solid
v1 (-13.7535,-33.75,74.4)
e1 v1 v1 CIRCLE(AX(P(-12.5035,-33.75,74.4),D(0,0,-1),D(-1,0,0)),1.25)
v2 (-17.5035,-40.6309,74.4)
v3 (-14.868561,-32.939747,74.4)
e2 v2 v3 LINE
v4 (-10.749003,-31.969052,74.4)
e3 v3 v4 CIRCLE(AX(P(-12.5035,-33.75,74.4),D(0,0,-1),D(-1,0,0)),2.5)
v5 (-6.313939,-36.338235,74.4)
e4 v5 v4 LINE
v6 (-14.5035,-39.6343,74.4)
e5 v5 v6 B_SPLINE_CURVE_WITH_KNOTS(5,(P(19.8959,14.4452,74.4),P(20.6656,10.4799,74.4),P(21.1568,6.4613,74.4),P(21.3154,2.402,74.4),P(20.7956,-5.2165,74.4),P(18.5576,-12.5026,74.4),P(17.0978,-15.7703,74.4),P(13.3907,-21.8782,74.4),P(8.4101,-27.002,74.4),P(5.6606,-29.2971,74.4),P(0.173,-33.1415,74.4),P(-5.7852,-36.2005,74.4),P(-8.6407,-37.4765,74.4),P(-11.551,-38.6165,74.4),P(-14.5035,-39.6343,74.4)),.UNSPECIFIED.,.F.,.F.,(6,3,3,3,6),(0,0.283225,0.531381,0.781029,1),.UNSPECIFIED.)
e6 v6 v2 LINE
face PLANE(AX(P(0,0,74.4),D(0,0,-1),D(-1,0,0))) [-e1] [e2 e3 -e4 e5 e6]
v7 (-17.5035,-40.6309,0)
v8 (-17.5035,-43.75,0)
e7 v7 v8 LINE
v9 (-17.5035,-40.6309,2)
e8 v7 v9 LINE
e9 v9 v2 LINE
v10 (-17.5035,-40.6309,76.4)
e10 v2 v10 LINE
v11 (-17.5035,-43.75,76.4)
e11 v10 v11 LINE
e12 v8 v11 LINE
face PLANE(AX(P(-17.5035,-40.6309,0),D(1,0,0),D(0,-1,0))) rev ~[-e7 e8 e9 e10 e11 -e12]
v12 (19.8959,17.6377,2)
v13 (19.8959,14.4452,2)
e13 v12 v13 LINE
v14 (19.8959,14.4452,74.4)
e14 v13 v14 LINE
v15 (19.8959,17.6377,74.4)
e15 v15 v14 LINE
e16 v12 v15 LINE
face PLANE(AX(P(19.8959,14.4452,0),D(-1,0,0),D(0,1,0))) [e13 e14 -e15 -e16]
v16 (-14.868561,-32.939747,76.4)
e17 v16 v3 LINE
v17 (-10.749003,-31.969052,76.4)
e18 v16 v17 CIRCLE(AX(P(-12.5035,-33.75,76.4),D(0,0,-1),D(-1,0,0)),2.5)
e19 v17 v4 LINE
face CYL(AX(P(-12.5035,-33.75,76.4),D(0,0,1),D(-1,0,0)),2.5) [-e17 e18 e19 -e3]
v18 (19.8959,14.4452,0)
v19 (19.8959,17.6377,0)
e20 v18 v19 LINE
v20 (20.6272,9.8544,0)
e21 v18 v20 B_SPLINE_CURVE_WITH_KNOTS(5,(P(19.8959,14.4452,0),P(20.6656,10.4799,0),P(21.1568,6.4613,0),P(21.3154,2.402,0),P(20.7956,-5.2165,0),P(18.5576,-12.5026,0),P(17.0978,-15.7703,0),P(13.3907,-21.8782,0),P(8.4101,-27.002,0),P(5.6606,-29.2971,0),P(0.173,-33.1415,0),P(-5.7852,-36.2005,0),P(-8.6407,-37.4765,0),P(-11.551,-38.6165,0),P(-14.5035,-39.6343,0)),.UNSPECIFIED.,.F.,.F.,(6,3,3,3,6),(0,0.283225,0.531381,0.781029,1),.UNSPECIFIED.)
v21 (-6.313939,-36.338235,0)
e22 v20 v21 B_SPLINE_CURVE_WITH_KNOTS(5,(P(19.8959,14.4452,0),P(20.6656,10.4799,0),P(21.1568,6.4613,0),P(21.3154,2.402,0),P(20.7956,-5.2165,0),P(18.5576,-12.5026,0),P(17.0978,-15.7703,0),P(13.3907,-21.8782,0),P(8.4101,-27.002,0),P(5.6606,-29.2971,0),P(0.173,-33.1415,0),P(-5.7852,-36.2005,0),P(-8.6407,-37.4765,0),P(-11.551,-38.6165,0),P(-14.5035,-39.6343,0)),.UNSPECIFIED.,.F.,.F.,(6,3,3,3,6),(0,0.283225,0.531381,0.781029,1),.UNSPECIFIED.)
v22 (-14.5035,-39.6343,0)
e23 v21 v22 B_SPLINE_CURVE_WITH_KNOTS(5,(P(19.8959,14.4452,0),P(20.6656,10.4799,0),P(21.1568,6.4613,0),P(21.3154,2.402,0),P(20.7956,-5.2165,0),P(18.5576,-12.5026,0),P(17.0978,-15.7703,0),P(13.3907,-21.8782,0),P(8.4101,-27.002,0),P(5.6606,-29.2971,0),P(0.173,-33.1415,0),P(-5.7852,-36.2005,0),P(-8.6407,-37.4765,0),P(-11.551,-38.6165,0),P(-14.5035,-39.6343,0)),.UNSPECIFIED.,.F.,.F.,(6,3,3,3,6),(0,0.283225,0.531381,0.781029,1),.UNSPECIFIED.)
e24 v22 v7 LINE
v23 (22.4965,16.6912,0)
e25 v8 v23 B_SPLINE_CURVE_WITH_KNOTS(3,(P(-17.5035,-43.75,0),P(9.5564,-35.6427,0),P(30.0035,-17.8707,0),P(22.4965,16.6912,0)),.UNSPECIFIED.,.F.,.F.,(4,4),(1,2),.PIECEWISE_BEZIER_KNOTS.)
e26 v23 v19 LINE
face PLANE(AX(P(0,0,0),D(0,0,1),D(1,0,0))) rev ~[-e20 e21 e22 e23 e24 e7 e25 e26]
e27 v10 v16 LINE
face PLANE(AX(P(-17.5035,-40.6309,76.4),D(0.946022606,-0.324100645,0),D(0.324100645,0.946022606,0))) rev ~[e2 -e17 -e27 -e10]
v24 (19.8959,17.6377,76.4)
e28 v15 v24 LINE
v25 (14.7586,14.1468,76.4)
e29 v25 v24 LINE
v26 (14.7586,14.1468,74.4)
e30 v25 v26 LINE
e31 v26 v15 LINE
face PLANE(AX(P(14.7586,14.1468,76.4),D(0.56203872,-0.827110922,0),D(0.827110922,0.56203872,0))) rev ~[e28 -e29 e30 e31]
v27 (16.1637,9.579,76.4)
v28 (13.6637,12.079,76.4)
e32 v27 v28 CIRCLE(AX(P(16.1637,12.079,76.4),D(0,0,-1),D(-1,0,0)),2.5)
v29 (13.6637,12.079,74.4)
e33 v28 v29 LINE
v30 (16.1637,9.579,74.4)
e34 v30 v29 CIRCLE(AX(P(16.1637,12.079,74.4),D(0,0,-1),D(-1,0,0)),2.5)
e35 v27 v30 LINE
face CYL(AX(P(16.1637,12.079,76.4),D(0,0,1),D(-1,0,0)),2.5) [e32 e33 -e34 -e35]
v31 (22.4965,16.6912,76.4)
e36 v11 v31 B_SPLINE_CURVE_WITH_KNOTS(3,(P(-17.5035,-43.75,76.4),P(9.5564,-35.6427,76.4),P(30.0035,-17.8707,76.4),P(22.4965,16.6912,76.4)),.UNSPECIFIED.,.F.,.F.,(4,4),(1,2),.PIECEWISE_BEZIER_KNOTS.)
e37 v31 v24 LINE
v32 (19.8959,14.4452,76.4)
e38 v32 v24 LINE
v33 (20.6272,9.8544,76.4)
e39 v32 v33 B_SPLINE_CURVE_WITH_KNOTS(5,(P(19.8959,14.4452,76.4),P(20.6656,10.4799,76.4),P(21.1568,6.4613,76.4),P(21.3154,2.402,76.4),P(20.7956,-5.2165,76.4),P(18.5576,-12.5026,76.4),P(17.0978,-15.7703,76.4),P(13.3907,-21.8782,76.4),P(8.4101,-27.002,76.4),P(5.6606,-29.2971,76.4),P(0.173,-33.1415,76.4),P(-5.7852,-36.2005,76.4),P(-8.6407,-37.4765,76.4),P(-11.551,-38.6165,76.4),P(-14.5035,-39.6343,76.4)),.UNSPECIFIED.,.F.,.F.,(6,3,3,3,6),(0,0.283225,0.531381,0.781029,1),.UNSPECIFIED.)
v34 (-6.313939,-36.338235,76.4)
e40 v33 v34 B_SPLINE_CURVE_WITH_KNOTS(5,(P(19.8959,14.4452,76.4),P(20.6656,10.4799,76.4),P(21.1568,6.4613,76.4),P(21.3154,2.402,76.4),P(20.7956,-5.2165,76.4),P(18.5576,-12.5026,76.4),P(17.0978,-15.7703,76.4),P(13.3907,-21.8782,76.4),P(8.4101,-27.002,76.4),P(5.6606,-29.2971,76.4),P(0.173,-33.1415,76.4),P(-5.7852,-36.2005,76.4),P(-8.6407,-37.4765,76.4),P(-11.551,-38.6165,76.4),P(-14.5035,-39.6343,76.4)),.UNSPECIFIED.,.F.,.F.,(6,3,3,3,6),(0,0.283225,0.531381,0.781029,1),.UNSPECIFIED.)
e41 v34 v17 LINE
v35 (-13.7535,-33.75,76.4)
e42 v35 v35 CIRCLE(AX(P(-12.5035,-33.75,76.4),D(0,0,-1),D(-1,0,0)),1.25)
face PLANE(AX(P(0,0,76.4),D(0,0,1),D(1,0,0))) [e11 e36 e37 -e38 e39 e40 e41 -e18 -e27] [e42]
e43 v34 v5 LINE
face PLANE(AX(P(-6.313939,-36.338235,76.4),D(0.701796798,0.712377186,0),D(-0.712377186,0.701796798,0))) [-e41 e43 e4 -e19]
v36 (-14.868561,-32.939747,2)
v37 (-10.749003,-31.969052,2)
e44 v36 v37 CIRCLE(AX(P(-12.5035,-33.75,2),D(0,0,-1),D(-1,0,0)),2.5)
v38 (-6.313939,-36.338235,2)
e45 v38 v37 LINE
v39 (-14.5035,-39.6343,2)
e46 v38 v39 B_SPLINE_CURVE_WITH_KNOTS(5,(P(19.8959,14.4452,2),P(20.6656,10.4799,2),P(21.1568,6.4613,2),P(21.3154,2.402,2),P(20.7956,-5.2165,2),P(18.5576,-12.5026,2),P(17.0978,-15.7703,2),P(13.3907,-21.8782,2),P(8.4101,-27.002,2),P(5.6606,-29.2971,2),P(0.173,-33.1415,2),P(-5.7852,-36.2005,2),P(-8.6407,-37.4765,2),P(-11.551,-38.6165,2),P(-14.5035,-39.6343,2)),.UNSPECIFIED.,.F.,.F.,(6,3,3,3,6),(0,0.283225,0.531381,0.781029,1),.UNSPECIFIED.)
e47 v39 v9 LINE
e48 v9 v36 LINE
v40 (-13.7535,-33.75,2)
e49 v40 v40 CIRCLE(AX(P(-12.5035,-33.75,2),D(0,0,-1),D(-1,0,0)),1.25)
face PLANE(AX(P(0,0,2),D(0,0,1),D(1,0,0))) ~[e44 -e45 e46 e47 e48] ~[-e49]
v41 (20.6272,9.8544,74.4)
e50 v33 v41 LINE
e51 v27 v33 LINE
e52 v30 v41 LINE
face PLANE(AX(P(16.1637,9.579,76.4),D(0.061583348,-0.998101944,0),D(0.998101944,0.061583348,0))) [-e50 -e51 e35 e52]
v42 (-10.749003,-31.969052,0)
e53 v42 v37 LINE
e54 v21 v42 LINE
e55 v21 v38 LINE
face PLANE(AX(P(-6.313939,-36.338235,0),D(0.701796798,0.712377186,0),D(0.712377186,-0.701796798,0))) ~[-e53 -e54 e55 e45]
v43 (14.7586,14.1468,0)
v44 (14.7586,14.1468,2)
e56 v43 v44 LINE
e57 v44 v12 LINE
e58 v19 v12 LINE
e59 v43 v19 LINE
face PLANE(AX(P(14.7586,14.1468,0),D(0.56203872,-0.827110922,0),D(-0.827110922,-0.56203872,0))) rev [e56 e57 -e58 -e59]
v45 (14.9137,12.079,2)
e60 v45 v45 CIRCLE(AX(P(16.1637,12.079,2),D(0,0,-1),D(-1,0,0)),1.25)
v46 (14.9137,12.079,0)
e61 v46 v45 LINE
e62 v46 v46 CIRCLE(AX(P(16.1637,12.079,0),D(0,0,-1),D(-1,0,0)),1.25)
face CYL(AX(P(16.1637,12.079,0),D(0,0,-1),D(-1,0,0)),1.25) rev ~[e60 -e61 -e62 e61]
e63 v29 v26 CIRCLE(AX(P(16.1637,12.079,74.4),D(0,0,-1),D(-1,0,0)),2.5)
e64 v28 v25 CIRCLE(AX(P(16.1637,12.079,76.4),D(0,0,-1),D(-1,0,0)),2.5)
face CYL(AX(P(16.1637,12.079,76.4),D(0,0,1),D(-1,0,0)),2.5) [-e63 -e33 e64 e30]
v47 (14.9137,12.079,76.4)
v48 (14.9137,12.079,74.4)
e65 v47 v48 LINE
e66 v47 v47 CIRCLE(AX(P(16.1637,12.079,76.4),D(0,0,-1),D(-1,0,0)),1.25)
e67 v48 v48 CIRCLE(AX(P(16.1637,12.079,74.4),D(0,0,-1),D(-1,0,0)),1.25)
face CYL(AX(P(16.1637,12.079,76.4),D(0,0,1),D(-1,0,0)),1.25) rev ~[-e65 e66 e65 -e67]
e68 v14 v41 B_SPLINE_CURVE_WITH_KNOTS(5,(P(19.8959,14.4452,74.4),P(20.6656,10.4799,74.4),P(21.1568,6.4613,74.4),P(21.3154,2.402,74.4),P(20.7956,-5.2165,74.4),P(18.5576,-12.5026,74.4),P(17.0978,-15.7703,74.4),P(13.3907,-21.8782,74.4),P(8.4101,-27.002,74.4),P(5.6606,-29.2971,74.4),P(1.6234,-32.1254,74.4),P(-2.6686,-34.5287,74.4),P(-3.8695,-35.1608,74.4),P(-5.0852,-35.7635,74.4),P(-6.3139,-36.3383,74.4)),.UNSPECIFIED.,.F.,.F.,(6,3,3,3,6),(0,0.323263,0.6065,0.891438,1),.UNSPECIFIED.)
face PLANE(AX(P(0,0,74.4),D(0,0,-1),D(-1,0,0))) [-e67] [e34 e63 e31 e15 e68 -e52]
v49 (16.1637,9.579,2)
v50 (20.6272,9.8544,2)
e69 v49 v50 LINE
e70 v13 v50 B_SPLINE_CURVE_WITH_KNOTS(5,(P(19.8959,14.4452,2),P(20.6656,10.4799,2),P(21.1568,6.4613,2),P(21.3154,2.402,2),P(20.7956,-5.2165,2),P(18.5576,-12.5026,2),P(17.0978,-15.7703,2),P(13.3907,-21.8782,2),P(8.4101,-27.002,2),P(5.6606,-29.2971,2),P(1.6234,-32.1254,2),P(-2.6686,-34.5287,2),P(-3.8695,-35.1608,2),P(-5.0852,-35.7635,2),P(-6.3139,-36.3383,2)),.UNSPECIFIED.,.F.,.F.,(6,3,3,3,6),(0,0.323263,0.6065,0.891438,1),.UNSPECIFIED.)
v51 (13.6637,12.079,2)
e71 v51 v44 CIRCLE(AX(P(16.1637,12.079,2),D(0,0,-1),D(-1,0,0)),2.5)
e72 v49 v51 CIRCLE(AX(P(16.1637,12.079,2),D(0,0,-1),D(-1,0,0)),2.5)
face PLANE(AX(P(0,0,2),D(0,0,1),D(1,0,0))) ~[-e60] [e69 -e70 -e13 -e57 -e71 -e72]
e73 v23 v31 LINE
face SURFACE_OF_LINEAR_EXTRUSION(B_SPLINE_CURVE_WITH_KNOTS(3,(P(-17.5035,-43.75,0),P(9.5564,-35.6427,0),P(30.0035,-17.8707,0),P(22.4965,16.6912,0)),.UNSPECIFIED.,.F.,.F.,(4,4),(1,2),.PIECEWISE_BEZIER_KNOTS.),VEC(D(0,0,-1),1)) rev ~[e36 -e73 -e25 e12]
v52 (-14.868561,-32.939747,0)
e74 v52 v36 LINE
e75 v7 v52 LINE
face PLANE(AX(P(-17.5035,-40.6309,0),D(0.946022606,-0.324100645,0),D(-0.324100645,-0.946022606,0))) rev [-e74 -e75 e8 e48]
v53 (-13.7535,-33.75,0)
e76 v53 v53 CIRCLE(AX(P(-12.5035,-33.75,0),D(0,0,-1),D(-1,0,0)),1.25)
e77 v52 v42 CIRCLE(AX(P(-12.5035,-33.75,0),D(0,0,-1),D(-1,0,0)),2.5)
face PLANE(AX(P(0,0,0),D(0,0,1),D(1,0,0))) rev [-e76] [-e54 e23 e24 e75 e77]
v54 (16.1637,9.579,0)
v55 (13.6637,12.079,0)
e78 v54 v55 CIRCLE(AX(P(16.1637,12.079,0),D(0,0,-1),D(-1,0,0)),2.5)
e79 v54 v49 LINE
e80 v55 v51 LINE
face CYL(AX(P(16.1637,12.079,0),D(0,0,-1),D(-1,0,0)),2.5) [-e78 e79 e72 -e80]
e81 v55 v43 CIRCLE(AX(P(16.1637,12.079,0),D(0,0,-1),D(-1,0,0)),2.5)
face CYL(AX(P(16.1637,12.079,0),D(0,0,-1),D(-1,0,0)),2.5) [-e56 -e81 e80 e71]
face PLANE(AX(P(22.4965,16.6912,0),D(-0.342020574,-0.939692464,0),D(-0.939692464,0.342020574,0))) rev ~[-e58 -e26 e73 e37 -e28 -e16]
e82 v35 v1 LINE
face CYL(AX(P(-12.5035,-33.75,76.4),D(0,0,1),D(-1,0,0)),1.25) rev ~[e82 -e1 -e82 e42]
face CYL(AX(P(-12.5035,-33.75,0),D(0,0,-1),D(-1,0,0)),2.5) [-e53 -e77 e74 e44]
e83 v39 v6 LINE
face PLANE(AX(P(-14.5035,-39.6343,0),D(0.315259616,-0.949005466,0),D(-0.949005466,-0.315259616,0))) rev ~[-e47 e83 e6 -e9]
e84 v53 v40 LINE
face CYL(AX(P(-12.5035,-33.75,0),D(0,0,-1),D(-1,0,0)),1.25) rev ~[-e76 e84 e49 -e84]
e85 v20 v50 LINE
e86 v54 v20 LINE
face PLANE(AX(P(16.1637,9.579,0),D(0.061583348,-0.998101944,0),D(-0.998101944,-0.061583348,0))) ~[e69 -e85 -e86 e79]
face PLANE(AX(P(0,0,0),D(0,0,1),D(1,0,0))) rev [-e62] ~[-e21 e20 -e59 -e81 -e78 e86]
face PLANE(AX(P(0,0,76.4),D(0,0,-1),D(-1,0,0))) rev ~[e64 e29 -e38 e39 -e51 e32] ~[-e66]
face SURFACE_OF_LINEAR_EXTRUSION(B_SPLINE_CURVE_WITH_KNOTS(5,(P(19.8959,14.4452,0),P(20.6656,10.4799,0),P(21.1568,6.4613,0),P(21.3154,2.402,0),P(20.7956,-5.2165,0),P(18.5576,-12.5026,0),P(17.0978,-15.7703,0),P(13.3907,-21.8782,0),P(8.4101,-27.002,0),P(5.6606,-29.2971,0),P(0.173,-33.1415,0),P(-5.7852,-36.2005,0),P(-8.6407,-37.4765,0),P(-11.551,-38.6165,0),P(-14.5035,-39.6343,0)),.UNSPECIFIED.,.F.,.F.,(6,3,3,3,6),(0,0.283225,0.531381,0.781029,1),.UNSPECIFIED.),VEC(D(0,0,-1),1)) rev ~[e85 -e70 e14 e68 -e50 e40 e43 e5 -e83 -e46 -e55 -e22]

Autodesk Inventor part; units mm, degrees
ref_plane "Work Plane1" through (0, 0, 0) normal (0, 0, 1) x (1, 0, 0)
sketch "Sketch1" plane through (0, 0, 0) normal (0, 0, 1) x (1, 0, 0)
  spline S0 degree 3 poles (-17.5035, -43.75) (9.5564, -35.6427) (30.0035, -17.8707) (22.4965, 16.6912) knots 1 1 1 1 2 2 2 2 projected
  line L0 (22.4965, 16.6912) -> (-1.9986, 25.6067) projected
  line L1 (-17.5035, 14.75) -> (-17.5035, -43.75) projected
  line L2 (-3.0246, 22.7876) -> (19.8959, 14.4452)
  line L3 (-14.5035, -39.6343) -> (-14.5035, 14.75)
  line L4 (19.8959, 14.4452) -> (19.8959, 17.6377)
  line L5 (-14.5035, -39.6343) -> (-17.5035, -40.6309)
  spline S1 degree 5 poles (19.896, 14.4452) (20.6656, 10.4799) (21.1568, 6.4613) (21.3154, 2.402) (20.7956, -5.2165) (18.5576, -12.5026) (17.0978, -15.7703) (13.3907, -21.8782) (8.4101, -27.002) (5.6606, -29.2971) (0.173, -33.1415) (-5.7852, -36.2005) (-8.6407, -37.4765) (-11.551, -38.6165) (-14.5035, -39.6343) knots 0 0 0 0 0 0 0.283225 0.283225 0.283225 0.531381 0.531381 0.531381 0.781029 0.781029 0.781029 1 1 1 1 1 1
  point P0 (0, 0)
  dimension "d0" = 3
  dimension "d1" = 3.1612
extrude "Extrusion1" add sketch "Sketch1" along normal blind 76.4
ref_plane "Work Plane2" through (0, 0, 76.4) normal (0, 0, -1) x (-1, 0, 0)
sketch "Sketch2" plane through (0, 0, 76.4) normal (0, 0, -1) x (-1, 0, 0)
  circle A0 centre (12.5035, -33.75) radius 1.25 projected
  line L0 (14.5035, -39.6343) -> (17.5035, -40.6309) projected
  line L1 (17.5035, -40.6309) -> (14.5806, -32.0992)
  line L2 (6.1137, -36.5355) -> (12.1128, -30.6255)
  circle A1 centre (12.5035, -33.75) radius 2.5
  spline S0 degree 5 poles (-19.8959, 14.4452) (-20.6656, 10.4799) (-21.1568, 6.4613) (-21.3154, 2.402) (-20.7956, -5.2165) (-18.5576, -12.5026) (-17.0978, -15.7703) (-13.3907, -21.8782) (-8.4101, -27.002) (-5.6606, -29.2971) (-0.173, -33.1415) (5.7852, -36.2005) (8.6407, -37.4765) (11.551, -38.6165) (14.5035, -39.6343) knots 0 0 0 0 0 0 0.283225 0.283225 0.283225 0.531381 0.531381 0.531381 0.781029 0.781029 0.781029 1 1 1 1 1 1 projected
  point P0 (0, 0)
  point P1 (14.8685, -32.9397)
  point P2 (10.749, -31.9691)
  point P3 (6.3139, -36.3383)
  dimension "d4" = 5
extrude "Extrusion2" add sketch "Sketch2" along normal blind 2
ref_plane "Work Plane3" through (0, 0, 76.4) normal (0, 0, -1) x (-1, 0, 0)
sketch "Sketch3" plane through (0, 0, 76.4) normal (0, 0, -1) x (-1, 0, 0)
  circle A0 centre (-16.1637, 12.079) radius 1.25 projected
  circle A1 centre (-16.1637, 12.079) radius 2.5
  line L0 (-19.8959, 17.6377) -> (-19.8959, 14.4452) projected
  line L1 (-14.7586, 14.1468) -> (-19.8959, 17.6377)
  line L2 (-16.1637, 9.579) -> (-20.6272, 9.8544)
  spline S0 degree 5 poles (-19.8959, 14.4452) (-20.6656, 10.4799) (-21.1568, 6.4613) (-21.3154, 2.402) (-20.7956, -5.2165) (-18.5576, -12.5026) (-17.0978, -15.7703) (-13.3907, -21.8782) (-8.4101, -27.002) (-5.6606, -29.2971) (-1.6234, -32.1254) (2.6686, -34.5287) (3.8695, -35.1608) (5.0852, -35.7635) (6.3139, -36.3383) knots 0 0 0 0 0 0 0.323263 0.323263 0.323263 0.6065 0.6065 0.6065 0.891438 0.891438 0.891438 1 1 1 1 1 1 projected
  point P0 (0, 0)
  dimension "d7" = 5
extrude "Extrusion3" add sketch "Sketch3" along normal blind 2
ref_plane "Work Plane4" through (0, 0, 38.2) normal (0, 0, -1) x (-1, 0, 0)
mirror "Mirror1" about plane through (0, 0, 38.2) normal (0, 0, -1) of "Extrusion3", "Extrusion2"
properties part number "clamsheel sheet surface" material "ABS Plastic"
